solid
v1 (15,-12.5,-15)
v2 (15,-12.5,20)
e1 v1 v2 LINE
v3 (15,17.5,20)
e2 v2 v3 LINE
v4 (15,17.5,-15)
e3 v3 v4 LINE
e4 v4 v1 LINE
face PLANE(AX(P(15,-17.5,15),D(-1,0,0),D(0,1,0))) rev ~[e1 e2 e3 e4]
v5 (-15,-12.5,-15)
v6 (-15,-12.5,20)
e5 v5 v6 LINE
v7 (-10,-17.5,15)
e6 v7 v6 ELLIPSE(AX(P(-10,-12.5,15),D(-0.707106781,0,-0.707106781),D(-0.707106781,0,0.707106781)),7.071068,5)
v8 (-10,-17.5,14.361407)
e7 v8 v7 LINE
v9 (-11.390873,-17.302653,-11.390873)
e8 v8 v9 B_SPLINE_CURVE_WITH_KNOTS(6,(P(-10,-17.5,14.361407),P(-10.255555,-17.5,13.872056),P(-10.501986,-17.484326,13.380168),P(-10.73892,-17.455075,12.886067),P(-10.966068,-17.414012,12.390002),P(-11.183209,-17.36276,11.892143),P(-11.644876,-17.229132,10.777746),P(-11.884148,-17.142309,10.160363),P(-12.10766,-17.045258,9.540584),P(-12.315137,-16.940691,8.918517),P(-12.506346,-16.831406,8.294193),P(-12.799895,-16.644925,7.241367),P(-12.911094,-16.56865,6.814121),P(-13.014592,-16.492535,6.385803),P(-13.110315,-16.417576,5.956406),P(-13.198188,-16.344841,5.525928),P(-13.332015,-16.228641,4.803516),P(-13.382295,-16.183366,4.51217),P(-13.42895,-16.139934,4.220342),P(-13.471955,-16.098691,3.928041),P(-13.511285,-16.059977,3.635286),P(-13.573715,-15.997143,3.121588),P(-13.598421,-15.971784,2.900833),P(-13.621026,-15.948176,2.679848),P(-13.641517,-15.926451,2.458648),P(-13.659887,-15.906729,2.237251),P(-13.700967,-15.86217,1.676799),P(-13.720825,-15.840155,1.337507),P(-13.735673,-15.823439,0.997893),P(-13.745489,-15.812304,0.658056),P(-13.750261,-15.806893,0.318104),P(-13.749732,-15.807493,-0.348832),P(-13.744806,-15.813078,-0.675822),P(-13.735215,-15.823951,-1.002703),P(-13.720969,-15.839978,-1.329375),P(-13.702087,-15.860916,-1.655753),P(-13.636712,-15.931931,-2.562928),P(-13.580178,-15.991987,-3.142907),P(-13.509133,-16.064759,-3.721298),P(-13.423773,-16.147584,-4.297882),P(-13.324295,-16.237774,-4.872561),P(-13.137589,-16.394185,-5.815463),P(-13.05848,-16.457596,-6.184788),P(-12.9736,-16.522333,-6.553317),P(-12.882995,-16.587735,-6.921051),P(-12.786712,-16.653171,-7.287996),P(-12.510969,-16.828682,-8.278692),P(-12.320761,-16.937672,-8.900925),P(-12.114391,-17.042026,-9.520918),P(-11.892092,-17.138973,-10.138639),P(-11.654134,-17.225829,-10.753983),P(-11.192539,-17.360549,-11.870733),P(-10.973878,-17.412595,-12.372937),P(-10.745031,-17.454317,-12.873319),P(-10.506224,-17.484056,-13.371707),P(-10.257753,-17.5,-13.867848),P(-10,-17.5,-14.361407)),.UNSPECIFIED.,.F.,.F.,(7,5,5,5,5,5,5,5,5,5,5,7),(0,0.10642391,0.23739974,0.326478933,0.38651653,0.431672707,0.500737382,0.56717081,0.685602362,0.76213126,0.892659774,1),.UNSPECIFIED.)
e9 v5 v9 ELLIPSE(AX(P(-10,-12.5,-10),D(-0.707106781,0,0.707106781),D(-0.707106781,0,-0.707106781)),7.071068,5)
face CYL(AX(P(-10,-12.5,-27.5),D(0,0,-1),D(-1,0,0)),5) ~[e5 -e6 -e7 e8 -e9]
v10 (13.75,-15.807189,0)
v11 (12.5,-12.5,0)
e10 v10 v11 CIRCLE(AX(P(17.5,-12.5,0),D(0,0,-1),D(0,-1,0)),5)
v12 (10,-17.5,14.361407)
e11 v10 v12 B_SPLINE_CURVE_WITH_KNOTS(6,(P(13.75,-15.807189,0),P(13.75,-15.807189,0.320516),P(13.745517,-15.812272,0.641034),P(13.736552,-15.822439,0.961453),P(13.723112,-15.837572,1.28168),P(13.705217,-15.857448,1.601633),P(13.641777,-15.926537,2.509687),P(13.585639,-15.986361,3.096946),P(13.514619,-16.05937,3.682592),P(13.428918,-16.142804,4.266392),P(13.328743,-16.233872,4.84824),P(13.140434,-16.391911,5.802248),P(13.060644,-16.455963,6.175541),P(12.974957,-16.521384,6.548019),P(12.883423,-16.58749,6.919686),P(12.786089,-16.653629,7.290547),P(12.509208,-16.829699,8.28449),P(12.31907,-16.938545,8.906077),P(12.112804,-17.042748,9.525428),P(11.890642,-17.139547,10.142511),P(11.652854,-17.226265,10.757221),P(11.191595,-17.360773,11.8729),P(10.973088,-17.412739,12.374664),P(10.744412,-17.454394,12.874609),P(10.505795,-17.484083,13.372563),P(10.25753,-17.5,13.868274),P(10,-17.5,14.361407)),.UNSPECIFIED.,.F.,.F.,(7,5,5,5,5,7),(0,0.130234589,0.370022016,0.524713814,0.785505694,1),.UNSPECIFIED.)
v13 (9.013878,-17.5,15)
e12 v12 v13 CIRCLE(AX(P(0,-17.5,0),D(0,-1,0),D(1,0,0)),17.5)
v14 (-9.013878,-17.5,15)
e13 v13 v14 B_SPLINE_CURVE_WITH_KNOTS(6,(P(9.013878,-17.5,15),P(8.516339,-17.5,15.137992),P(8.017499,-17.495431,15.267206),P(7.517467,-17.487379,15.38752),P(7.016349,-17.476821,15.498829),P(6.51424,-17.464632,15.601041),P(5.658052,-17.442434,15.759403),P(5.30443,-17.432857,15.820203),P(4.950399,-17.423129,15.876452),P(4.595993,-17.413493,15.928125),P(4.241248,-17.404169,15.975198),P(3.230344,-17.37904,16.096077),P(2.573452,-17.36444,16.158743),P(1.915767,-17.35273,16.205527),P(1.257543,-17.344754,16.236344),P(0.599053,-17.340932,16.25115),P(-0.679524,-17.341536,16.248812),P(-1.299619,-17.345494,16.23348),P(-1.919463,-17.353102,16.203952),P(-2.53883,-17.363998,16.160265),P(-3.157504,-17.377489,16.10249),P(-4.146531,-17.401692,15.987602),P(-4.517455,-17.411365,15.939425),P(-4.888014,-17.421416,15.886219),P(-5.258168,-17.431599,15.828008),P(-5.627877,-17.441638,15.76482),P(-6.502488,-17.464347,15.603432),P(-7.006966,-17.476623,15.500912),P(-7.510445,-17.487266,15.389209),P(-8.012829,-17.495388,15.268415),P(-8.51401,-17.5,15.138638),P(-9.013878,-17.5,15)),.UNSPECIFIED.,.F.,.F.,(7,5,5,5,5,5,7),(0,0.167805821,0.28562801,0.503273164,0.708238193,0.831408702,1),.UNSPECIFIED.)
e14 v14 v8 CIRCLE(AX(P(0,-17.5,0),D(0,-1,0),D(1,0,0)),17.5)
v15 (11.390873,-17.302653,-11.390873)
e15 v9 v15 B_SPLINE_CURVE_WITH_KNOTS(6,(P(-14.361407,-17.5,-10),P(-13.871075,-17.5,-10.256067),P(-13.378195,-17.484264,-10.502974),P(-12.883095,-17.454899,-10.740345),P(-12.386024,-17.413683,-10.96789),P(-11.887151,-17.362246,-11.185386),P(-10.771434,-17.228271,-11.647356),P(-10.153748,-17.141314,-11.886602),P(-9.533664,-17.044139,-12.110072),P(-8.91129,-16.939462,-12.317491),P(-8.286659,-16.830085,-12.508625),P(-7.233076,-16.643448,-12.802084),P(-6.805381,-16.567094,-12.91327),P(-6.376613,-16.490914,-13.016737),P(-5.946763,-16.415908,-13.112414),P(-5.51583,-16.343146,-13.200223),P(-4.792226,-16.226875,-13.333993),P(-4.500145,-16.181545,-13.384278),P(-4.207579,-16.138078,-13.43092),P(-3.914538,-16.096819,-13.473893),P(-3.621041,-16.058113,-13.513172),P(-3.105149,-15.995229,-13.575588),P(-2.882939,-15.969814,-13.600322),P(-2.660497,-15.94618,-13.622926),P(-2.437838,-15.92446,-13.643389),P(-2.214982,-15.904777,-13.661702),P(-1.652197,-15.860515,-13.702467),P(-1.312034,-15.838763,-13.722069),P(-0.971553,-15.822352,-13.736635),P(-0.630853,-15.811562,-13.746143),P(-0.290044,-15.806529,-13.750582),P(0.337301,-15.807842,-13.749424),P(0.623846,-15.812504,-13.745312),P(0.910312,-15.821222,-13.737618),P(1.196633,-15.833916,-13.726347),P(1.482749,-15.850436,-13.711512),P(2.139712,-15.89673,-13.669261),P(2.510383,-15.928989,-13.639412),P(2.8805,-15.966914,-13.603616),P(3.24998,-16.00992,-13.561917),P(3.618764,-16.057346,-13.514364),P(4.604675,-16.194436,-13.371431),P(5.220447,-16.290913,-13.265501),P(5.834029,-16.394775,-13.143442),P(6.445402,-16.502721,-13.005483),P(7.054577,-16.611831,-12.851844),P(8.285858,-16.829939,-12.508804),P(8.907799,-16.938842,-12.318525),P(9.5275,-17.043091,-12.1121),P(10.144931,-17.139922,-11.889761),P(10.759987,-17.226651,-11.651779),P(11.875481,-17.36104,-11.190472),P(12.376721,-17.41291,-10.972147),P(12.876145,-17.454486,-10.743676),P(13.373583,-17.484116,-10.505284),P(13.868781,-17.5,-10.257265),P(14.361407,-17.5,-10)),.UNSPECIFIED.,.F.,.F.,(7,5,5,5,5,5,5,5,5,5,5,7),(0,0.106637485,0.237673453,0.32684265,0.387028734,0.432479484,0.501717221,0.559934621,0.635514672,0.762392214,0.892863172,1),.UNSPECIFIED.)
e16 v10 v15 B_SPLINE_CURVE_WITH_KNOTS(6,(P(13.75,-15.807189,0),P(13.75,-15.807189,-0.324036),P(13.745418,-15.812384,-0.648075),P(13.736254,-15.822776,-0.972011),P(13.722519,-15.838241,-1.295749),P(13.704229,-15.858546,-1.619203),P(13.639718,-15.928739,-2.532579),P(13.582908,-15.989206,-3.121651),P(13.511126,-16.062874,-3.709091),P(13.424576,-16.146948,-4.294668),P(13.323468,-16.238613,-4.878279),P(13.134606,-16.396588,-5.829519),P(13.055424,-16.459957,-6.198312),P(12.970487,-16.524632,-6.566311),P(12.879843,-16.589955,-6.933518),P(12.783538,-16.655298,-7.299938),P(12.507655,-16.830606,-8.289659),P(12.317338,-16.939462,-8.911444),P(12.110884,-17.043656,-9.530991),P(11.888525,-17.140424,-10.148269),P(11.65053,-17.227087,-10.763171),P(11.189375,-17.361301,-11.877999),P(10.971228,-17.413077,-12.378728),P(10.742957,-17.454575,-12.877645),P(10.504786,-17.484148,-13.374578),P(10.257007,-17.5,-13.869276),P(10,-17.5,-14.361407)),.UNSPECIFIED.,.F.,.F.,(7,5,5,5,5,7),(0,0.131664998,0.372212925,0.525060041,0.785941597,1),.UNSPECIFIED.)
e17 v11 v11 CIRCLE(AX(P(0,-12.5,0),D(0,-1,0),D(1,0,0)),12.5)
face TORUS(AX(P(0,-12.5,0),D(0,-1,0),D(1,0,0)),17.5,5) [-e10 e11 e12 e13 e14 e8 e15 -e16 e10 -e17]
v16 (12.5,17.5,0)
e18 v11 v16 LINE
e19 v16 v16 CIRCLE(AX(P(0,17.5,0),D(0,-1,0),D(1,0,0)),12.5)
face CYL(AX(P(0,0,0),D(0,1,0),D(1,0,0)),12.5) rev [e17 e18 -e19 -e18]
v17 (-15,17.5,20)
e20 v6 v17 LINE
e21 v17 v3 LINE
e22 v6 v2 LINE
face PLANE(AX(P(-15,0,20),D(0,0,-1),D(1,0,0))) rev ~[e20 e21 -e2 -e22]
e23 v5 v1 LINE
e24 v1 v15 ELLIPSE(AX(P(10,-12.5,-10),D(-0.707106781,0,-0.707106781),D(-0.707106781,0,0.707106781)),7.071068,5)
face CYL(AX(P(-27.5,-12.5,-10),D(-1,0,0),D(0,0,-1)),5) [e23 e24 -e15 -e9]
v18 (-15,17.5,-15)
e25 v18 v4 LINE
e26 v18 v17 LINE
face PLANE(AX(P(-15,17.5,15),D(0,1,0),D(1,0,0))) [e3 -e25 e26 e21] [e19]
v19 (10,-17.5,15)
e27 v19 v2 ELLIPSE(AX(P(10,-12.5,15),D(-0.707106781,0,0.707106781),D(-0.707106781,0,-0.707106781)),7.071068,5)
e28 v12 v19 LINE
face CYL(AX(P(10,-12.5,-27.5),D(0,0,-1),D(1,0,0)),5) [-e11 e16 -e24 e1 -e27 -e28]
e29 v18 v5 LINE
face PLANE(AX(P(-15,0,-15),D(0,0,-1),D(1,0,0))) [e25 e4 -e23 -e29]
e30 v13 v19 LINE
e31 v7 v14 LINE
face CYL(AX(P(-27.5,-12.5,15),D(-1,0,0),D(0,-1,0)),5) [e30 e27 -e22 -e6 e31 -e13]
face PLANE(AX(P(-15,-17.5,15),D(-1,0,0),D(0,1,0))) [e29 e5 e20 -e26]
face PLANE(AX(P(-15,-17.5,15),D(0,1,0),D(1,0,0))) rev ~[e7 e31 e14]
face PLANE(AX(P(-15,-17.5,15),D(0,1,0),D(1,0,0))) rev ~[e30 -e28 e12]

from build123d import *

# Parameters (mm, degrees)
F0_W        = 30
F0_H        = 30
F0_R        = 12.5
F1_DEPTH    = 17.5
F2_DEPTH    = 5
F3_T1_DEPTH = 55
F3_T3_DEPTH = 60


# Not quite as in the source:
# - a fillet or chamfer that OpenCascade refuses, or shapes differently, is made with other operations: its cross-section is extruded or revolved along the edge and cut away or added


with BuildPart() as f1:
    # F0 (on Front) → F1 (new body, symmetric)
    with BuildSketch(Plane.XZ):
        Rectangle(F0_W, F0_H)
        Circle(F0_R, mode=Mode.SUBTRACT)
    extrude(amount=F1_DEPTH, both=True)

    # F2 (add): a face of the model
    f2_faces = [f1.faces().sort_by_distance(p)[0] for p in [
        (0, 0, 15),
    ]]
    extrude(f2_faces, amount=F2_DEPTH)

    # F3: fillet of radius 5 on 5 edges, made by hand

    # F3_s2 → F3_t1 (cut)
    with BuildSketch(Plane.YZ.offset(-27.5)):
        with BuildLine():
            ThreePointArc((-12.5, -15), (-16.0355339059, -13.5355339059), (-17.5, -10))
            Line((-17.5, -10), (-17.5, -15))
            Line((-17.5, -15), (-12.5, -15))
        make_face()
        with BuildLine():
            ThreePointArc((-17.5, 15), (-16.0355339059, 18.5355339059), (-12.5, 20))
            Line((-12.5, 20), (-17.5, 20))
            Line((-17.5, 20), (-17.5, 15))
        make_face()
    extrude(amount=F3_T1_DEPTH, mode=Mode.SUBTRACT)

    # F3_s4 → F3_t3 (cut)
    with BuildSketch(Plane.XY.offset(-27.5)):
        with BuildLine():
            ThreePointArc((15, -12.5), (13.5355339059, -16.0355339059), (10, -17.5))
            Line((10, -17.5), (15, -17.5))
            Line((15, -17.5), (15, -12.5))
        make_face()
        with BuildLine():
            ThreePointArc((-15, -12.5), (-13.5355339059, -16.0355339059), (-10, -17.5))
            Line((-10, -17.5), (-15, -17.5))
            Line((-15, -17.5), (-15, -12.5))
        make_face()
    extrude(amount=F3_T3_DEPTH, mode=Mode.SUBTRACT)

    # F3_s5 → F3_t6 (revolve, cut)
    with BuildSketch(Plane.XY):
        with BuildLine():
            ThreePointArc((17.5, -17.5), (13.9644660941, -16.0355339059), (12.5, -12.5))
            Line((12.5, -12.5), (12.5, -17.5))
            Line((12.5, -17.5), (17.5, -17.5))
        make_face()
    revolve(axis=Axis((0, -17.5, 0), (0, -1, 0)), mode=Mode.SUBTRACT)


solid = f1.part
